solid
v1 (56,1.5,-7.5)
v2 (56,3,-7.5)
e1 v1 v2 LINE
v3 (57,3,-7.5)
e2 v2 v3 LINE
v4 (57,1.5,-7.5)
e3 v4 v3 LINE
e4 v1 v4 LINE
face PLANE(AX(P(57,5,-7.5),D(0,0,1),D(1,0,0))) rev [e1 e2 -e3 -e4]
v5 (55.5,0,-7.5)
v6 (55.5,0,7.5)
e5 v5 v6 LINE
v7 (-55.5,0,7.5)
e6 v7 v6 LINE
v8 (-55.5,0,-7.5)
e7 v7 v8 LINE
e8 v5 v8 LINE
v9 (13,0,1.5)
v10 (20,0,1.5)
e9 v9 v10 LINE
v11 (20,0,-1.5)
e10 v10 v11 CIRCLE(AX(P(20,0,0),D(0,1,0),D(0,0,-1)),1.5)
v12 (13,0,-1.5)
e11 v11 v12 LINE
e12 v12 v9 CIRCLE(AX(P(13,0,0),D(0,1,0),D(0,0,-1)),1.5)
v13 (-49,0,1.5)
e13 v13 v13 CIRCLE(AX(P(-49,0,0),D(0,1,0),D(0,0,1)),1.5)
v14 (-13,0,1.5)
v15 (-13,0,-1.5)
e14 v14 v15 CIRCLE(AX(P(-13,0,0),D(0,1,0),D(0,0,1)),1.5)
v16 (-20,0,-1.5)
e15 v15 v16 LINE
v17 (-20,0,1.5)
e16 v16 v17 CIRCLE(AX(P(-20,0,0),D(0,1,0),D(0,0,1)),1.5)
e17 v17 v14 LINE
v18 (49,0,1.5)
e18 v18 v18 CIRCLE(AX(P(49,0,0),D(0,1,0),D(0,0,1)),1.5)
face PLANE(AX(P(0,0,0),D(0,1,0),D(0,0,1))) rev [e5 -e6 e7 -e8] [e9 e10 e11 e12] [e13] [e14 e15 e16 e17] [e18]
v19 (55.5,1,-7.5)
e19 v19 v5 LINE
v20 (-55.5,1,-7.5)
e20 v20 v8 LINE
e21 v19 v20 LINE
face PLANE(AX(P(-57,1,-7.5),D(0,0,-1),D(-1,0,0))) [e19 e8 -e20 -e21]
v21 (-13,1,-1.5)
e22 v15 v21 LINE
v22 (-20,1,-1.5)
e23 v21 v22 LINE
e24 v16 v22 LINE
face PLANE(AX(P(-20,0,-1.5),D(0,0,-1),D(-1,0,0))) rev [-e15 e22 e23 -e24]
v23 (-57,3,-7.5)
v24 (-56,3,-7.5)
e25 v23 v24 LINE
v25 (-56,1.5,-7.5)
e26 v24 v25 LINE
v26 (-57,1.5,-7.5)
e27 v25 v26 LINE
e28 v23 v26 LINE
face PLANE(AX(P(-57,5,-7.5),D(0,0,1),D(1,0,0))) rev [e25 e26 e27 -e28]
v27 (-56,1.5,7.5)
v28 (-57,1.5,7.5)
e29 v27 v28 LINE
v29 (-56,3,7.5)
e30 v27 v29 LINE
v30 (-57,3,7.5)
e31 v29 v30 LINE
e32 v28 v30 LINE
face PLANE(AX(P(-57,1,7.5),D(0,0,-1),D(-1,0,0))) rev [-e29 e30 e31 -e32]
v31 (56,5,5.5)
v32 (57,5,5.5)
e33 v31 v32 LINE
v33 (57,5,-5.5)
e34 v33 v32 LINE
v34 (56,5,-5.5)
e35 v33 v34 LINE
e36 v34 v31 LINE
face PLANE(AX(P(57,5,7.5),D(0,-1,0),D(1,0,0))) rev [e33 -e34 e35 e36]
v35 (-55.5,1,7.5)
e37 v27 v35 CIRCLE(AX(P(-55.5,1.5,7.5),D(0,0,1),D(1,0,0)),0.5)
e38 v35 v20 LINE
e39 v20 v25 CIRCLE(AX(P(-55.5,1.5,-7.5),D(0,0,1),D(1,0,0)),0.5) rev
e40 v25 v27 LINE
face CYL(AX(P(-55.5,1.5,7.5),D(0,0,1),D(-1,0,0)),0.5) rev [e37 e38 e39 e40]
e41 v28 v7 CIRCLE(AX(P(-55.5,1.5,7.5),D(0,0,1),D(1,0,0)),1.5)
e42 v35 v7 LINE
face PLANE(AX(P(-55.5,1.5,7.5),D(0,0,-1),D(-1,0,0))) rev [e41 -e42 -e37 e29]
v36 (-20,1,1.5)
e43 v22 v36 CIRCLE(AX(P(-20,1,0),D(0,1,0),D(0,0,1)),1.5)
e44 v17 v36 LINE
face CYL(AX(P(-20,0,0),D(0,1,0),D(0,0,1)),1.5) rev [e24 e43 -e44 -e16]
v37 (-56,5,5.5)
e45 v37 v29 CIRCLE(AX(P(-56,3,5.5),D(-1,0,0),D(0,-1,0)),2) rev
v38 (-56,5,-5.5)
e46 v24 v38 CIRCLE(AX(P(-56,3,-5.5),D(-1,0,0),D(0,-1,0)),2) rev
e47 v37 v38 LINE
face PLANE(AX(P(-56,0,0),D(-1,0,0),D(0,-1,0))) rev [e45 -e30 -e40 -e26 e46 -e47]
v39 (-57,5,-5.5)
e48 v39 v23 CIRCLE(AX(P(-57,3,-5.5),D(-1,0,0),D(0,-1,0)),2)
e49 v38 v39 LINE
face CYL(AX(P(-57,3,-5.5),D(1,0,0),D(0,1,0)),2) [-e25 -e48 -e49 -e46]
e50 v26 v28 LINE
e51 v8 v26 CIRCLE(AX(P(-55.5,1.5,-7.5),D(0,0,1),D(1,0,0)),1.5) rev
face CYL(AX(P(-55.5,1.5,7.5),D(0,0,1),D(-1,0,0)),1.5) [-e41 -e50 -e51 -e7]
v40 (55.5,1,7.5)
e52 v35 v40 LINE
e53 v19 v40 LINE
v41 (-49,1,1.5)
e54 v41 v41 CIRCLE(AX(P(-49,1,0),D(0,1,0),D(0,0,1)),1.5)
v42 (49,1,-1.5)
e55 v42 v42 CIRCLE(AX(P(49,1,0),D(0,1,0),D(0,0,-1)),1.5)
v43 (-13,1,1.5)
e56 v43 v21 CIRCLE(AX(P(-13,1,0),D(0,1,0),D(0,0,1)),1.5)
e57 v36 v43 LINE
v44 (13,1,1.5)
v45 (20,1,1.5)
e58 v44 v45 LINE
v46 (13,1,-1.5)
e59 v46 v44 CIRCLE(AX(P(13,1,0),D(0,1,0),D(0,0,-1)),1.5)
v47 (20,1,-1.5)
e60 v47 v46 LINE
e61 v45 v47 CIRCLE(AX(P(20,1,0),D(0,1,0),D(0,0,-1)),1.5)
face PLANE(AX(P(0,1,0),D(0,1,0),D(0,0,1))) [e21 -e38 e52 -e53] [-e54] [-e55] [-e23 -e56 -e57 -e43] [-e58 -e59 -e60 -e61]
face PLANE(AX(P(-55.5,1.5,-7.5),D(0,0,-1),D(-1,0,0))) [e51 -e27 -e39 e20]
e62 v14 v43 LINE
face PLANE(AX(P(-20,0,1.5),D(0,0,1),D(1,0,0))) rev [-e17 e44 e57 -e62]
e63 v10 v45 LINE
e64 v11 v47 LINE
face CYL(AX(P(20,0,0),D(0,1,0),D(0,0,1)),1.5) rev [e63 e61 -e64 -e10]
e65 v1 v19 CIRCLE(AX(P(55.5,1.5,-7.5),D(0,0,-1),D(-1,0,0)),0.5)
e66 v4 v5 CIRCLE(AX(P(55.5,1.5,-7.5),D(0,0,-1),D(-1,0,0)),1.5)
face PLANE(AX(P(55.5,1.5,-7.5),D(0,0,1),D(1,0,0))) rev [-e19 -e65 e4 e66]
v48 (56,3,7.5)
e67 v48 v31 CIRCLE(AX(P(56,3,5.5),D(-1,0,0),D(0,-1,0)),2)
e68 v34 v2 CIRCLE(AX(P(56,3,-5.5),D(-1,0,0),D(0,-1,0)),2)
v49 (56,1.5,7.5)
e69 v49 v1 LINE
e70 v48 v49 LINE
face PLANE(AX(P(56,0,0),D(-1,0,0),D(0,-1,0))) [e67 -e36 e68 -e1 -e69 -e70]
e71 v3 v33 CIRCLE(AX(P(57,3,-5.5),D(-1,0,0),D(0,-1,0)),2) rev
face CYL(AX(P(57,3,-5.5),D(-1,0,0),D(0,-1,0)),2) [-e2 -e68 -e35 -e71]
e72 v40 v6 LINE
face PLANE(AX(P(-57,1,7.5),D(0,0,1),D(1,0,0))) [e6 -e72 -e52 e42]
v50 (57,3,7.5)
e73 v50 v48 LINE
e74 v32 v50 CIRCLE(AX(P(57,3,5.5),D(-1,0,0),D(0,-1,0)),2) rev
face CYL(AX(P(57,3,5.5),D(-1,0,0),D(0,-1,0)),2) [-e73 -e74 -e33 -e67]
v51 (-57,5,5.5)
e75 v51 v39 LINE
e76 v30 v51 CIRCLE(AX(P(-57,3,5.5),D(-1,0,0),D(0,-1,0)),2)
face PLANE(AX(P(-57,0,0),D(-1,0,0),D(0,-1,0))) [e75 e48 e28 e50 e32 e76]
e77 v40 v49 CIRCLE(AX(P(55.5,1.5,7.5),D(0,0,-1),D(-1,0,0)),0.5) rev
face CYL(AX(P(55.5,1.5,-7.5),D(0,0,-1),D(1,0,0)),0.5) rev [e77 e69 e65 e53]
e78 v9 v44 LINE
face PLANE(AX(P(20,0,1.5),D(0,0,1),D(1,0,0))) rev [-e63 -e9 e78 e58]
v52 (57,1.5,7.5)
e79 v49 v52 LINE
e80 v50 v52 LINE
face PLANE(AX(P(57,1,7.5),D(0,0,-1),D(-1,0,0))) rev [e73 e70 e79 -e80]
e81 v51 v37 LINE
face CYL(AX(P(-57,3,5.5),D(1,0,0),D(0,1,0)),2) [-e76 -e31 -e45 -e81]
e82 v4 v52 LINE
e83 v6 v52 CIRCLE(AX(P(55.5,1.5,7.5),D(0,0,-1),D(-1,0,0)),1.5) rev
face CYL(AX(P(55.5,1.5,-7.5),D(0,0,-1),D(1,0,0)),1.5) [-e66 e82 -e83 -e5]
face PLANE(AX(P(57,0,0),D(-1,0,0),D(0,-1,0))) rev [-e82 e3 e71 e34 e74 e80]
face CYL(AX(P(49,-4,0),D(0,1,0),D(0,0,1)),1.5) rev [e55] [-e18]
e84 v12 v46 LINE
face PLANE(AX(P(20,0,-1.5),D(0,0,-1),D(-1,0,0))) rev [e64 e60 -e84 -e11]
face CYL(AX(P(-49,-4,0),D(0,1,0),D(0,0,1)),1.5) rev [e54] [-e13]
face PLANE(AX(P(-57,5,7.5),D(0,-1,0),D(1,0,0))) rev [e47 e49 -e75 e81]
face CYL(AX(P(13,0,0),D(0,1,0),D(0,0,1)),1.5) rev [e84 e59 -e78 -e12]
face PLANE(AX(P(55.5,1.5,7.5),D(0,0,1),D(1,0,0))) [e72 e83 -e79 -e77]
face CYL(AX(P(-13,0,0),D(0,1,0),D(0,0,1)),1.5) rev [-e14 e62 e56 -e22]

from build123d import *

# Parameters (mm, degrees)
SKETCH_1_W                         = 114
SKETCH_1_H                         = 15
EXTRUDE_1_DEPTH                    = 1
SM_EDGE_FLANGE_1_STRIP_W           = 5
SM_EDGE_FLANGE_1_STRIP_H           = 1
SM_EDGE_FLANGE_1_STRIP_CUT_DEPTH   = 15
SM_EDGE_FLANGE_1_STRIP_2_W         = 5
SM_EDGE_FLANGE_1_STRIP_2_H         = 1
SM_EDGE_FLANGE_1_STRIP_CUT_2_DEPTH = 15
SM_EDGE_FLANGE_1_DEPTH             = 15
SM_EDGE_FLANGE_1_BEND_DEPTH        = 15
CUT_EXTRUDE_1_DEPTH                = 58.630287176
SKETCH_13_R                        = 1.5
CUT_EXTRUDE_2_DEPTH                = 5
FILLET_1_R                         = 2


# Sheet-metal steps are written as plain solids
with BuildPart() as part:
    # Sketch 1 → Бобышка-Вытянуть1 (new body)
    with BuildSketch(Plane(origin=(0, 0, 0), x_dir=(1, 0, 0), z_dir=(0, 1, 0))):
        Rectangle(SKETCH_1_W, SKETCH_1_H)
    extrude(amount=EXTRUDE_1_DEPTH)

    # Ребро-кромка1 strip (across the edge) → Ребро-кромка1 strip cut (cut)
    with BuildSketch(Plane(origin=(57, 1, 7.5), x_dir=(-1, 0, 0), z_dir=(0, 0, -1))):
        with Locations((-1, -0.5)):
            Rectangle(SM_EDGE_FLANGE_1_STRIP_W, SM_EDGE_FLANGE_1_STRIP_H)
    extrude(amount=SM_EDGE_FLANGE_1_STRIP_CUT_DEPTH, mode=Mode.SUBTRACT)

    # Ребро-кромка1 strip 2 (across the edge) → Ребро-кромка1 strip cut 2 (cut)
    with BuildSketch(Plane(origin=(-57, 1, -7.5), x_dir=(1, 0, 0), z_dir=(0, 0, 1))):
        with Locations((-1, -0.5)):
            Rectangle(SM_EDGE_FLANGE_1_STRIP_2_W, SM_EDGE_FLANGE_1_STRIP_2_H)
    extrude(amount=SM_EDGE_FLANGE_1_STRIP_CUT_2_DEPTH, mode=Mode.SUBTRACT)

    # Ребро-кромка1 section (across the edge) → Ребро-кромка1 (add)
    with BuildSketch(Plane(origin=(57, 1, 7.5), x_dir=(-1, 0, 0), z_dir=(0, 0, -1))):
        with BuildLine():
            Line((0, 0.5), (0, 4))
            Line((0, 4), (1, 4))
            Line((1, 4), (1, 0.5))
            ThreePointArc((1, 0.5), (1.146446609, 0.146446609), (1.5, 0))
            Line((1.5, 0), (1.5, -1))
            ThreePointArc((1.5, -1), (0.439339828, -0.560660172), (0, 0.5))
        make_face()
    extrude(amount=SM_EDGE_FLANGE_1_DEPTH)

    # Ребро-кромка1 section 2 (across the edge) → Ребро-кромка1 bend (add)
    with BuildSketch(Plane(origin=(-57, 1, -7.5), x_dir=(1, 0, 0), z_dir=(0, 0, 1))):
        with BuildLine():
            Line((0, 0.5), (0, 4))
            Line((0, 4), (1, 4))
            Line((1, 4), (1, 0.5))
            ThreePointArc((1, 0.5), (1.146446609, 0.146446609), (1.5, 0))
            Line((1.5, 0), (1.5, -1))
            ThreePointArc((1.5, -1), (0.439339828, -0.560660172), (0, 0.5))
        make_face()
    extrude(amount=SM_EDGE_FLANGE_1_BEND_DEPTH)

    # Эскиз12 → Вырез-Вытянуть1 (cut, through all)
    with BuildSketch(Plane(origin=(0, 1, 0), x_dir=(1, 0, 0), z_dir=(0, 1, 0))):
        with BuildLine():
            Line((-20, 1.5), (-13, 1.5))
            ThreePointArc((-13, 1.5), (-11.5, 0), (-13, -1.5))
            Line((-13, -1.5), (-20, -1.5))
            ThreePointArc((-20, -1.5), (-21.5, 0), (-20, 1.5))
        make_face()
        with BuildLine():
            Line((20, 1.5), (13, 1.5))
            ThreePointArc((13, 1.5), (11.5, 0), (13, -1.5))
            Line((13, -1.5), (20, -1.5))
            ThreePointArc((20, -1.5), (21.5, 0), (20, 1.5))
        make_face()
    extrude(amount=-CUT_EXTRUDE_1_DEPTH, mode=Mode.SUBTRACT)

    # Эскиз13 → Вырез-Вытянуть2 (cut)
    with BuildSketch(Plane(origin=(0, 1, 0), x_dir=(1, 0, 0), z_dir=(0, 1, 0))):
        with Locations(Location((-49, 0, 0), (0, 0, 270))):
            Circle(SKETCH_13_R)
        with Locations(Location((49, 0, 0), (0, 0, 270))):
            Circle(SKETCH_13_R)
    extrude(amount=-CUT_EXTRUDE_2_DEPTH, mode=Mode.SUBTRACT)

    # Скругление1
    fillet_1_edges = [part.edges().sort_by_distance(p)[0] for p in [
        (56.5, 5, 7.5),
        (56.5, 5, -7.5),
        (-56.5, 5, -7.5),
        (-56.5, 5, 7.5),
    ]]
    fillet(fillet_1_edges, radius=FILLET_1_R)


solid = part.part
